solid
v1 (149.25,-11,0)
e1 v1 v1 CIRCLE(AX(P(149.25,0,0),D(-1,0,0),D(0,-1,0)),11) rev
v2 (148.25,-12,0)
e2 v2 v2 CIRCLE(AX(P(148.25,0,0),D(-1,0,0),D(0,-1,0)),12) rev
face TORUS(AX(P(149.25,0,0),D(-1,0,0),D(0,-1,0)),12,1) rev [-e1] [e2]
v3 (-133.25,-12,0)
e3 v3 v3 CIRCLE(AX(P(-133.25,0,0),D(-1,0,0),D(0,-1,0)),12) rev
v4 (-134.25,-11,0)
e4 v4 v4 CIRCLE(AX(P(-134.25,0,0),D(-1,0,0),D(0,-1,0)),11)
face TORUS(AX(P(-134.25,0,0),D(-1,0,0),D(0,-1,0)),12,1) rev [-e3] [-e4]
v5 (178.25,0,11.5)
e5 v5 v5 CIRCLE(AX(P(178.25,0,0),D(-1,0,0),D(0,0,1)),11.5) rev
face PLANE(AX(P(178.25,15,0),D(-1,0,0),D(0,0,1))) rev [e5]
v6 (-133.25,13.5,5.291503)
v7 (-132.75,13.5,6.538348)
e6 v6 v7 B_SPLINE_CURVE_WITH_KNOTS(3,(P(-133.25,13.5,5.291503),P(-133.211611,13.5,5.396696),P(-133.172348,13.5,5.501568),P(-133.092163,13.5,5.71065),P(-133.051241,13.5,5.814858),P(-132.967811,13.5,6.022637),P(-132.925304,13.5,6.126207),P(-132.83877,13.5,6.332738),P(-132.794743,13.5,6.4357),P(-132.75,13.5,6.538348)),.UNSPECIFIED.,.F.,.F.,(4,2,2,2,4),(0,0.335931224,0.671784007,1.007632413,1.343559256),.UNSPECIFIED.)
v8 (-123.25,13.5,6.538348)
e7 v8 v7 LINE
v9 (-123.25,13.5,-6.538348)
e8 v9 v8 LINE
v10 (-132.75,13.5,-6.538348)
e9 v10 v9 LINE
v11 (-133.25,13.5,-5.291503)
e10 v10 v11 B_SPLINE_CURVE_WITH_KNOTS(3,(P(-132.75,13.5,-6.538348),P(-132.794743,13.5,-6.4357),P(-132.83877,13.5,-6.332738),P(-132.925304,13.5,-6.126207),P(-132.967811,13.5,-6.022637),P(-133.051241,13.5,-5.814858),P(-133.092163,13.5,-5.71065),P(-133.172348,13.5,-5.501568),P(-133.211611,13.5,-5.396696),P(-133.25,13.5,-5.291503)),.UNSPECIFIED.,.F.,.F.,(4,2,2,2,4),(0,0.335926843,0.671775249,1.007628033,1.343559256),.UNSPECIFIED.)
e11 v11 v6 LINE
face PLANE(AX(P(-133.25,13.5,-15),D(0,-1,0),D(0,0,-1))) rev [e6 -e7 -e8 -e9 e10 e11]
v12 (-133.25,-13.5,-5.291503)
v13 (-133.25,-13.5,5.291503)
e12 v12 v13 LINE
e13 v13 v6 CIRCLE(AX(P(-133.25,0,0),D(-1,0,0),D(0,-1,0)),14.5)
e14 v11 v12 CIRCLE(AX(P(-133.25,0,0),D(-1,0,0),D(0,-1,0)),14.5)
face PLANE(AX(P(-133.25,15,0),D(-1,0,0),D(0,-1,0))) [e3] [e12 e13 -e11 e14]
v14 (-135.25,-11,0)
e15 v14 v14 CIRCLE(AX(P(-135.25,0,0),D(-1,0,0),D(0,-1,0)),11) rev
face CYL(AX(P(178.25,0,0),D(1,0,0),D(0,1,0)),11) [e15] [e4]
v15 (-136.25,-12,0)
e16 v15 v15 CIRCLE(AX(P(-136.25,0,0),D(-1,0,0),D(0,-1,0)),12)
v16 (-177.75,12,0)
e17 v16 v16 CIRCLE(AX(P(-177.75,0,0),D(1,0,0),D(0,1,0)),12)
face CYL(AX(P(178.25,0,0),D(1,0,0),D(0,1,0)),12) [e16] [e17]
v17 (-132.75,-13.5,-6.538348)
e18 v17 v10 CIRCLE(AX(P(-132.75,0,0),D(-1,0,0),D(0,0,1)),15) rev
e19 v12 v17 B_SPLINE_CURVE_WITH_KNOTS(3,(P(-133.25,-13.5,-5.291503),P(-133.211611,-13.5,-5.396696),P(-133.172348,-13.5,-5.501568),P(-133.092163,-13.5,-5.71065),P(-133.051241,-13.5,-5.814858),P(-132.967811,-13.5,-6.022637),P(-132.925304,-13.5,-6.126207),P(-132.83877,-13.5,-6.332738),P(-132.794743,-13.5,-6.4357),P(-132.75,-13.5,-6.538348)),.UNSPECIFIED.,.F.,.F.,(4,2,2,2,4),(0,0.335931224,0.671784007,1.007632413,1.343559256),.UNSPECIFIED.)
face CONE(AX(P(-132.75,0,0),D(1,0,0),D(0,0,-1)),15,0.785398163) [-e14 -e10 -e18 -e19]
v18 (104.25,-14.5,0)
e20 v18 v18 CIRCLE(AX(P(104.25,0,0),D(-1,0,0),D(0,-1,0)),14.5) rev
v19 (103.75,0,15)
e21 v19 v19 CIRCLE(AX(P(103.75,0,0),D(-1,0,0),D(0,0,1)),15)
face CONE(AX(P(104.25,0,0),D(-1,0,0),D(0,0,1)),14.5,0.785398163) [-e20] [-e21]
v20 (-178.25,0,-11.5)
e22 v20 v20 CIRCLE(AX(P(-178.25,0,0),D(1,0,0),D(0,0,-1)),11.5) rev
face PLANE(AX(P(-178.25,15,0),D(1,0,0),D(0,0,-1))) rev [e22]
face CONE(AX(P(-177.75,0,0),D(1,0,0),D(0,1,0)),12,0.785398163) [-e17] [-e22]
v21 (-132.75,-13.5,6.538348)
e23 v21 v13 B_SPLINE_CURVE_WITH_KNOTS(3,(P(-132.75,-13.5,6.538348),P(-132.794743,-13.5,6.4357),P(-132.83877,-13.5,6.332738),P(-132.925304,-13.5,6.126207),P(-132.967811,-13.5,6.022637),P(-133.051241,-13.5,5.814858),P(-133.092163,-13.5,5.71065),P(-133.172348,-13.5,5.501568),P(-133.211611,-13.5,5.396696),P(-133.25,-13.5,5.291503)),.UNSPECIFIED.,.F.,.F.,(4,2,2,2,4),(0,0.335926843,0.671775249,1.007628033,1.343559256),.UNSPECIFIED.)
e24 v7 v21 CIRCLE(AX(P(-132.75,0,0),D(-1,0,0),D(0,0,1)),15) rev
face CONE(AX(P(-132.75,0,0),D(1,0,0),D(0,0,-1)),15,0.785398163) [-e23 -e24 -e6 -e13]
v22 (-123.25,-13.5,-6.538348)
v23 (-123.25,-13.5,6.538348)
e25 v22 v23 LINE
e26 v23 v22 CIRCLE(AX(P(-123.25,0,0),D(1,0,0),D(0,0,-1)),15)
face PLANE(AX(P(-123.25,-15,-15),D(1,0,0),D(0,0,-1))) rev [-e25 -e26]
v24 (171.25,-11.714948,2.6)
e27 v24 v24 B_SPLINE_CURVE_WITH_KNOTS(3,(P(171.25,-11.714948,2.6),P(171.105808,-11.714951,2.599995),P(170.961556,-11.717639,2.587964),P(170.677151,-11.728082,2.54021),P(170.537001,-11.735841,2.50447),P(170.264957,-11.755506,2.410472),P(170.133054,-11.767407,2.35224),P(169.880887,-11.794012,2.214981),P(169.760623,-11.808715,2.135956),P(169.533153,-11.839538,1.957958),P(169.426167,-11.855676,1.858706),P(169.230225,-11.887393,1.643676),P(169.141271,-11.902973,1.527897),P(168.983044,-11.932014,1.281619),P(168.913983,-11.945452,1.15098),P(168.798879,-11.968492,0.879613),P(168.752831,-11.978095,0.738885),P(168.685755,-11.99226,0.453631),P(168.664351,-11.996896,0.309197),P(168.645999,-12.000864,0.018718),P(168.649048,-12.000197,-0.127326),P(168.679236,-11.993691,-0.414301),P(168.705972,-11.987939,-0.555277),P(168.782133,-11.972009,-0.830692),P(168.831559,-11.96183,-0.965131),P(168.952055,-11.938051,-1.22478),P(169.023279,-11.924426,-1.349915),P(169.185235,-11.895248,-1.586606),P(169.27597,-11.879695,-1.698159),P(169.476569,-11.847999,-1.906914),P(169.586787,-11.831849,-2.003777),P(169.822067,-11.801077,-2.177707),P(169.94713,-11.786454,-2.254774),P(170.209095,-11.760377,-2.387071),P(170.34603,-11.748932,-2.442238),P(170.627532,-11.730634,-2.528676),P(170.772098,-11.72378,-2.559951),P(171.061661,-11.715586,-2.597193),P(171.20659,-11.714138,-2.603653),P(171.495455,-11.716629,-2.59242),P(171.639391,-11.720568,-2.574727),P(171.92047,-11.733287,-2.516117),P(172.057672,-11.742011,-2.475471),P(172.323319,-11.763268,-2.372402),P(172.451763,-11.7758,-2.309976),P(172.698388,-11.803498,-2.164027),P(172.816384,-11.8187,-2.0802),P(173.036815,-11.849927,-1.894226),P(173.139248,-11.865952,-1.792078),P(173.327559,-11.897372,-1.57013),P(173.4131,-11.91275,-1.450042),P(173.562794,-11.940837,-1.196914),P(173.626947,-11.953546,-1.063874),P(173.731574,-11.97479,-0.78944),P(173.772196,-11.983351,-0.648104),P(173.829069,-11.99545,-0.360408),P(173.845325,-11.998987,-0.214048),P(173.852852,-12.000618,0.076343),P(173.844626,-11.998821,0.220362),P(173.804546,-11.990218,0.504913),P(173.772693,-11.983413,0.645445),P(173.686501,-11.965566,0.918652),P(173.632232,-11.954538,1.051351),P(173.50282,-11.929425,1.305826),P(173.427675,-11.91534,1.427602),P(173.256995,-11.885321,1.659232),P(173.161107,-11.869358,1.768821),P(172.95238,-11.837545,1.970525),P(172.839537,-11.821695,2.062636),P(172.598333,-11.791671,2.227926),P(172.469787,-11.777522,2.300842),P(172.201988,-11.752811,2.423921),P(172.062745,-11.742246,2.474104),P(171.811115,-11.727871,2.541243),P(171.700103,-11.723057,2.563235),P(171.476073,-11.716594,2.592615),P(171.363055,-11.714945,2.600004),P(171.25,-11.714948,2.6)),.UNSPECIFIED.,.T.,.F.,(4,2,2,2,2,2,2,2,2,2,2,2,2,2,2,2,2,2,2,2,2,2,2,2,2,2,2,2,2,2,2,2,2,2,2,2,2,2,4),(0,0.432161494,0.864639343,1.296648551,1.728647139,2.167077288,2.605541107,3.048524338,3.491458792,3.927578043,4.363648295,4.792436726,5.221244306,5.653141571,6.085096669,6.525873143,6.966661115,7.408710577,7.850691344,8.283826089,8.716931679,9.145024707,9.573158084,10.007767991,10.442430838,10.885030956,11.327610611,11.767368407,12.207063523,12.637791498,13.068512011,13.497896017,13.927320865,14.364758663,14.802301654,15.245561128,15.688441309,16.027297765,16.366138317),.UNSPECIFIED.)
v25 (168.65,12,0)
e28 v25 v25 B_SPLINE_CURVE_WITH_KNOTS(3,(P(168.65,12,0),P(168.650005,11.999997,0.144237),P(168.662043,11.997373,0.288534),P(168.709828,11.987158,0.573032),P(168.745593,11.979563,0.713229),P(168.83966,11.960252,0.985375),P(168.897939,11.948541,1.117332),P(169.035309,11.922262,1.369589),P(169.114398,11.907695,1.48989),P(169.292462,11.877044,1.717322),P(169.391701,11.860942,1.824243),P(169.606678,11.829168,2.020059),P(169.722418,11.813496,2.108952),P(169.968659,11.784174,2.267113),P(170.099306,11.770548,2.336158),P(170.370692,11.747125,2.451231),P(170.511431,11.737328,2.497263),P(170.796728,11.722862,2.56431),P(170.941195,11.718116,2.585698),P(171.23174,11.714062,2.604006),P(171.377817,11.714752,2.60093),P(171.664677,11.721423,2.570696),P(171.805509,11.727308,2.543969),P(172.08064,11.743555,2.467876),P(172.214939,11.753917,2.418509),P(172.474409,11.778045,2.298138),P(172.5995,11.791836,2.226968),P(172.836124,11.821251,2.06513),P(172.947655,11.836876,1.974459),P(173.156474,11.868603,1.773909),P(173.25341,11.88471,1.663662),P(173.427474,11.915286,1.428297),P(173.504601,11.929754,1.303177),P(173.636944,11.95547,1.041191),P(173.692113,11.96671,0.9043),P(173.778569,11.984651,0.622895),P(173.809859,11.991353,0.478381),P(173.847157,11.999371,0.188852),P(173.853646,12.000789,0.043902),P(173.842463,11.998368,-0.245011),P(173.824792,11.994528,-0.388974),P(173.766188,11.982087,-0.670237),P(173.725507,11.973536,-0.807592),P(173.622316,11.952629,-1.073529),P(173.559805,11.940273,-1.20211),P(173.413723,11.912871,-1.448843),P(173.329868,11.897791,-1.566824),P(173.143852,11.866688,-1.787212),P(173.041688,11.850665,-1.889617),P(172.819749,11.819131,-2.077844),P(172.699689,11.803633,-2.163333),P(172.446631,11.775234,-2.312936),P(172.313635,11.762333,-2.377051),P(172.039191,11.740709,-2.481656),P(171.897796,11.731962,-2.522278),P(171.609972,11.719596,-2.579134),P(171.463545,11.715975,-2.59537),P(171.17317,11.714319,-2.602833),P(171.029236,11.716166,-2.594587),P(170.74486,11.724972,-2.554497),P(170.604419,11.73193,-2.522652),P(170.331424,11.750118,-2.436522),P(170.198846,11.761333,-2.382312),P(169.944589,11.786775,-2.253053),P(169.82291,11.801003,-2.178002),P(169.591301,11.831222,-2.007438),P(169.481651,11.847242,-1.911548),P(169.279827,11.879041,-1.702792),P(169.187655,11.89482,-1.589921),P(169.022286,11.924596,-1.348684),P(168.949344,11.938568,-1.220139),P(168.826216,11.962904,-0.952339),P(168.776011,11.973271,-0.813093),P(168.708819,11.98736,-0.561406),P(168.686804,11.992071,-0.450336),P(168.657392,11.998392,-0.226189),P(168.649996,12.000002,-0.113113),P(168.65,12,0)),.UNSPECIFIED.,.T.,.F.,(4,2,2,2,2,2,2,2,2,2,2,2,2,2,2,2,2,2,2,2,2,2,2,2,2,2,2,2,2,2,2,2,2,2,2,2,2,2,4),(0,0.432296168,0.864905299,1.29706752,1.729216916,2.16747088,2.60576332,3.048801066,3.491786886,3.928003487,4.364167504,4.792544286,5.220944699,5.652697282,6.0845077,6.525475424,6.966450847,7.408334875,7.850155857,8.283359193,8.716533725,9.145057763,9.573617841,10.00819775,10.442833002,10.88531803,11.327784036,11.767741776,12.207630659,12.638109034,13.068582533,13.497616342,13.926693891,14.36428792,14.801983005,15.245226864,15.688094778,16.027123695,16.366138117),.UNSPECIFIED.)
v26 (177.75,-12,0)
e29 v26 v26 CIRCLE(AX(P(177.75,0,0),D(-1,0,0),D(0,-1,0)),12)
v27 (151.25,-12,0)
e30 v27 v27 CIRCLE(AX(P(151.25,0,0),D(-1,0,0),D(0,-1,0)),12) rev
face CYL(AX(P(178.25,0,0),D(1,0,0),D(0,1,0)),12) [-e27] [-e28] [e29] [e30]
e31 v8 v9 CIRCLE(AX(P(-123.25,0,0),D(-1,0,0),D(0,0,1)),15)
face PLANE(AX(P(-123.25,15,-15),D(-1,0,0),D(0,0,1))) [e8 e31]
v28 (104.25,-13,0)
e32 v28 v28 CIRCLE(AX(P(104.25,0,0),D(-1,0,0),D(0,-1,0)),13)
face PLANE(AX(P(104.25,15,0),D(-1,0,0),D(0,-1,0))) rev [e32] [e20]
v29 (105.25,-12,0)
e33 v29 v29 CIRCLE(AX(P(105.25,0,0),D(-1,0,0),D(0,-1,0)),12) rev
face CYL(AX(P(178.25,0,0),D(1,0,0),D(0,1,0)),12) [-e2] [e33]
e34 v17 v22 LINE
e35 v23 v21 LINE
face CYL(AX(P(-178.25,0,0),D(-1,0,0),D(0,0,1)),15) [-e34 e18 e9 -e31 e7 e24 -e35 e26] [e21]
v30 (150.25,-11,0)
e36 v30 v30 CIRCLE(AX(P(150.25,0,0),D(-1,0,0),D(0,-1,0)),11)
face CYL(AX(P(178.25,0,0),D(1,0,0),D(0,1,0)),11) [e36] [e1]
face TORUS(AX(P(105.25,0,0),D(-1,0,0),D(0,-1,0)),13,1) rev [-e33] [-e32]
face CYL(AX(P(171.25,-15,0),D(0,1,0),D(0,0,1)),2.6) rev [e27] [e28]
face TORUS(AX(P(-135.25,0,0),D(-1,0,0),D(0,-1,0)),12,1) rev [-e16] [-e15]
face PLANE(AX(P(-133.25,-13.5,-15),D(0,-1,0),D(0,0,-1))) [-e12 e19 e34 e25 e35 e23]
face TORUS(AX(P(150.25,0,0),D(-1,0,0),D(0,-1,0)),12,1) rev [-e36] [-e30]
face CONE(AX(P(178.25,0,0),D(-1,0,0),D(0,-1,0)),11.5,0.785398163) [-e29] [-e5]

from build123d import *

# Parameters (mm, degrees)
SKETCH1_W               = 356.5
SKETCH1_H               = 15
SKETCH2_W               = 3
SKETCH2_H               = 1
CUT_EXTRUDE1_DEPTH      = 180.507834091
CUT_EXTRUDE1_DEPTH_BACK = 180.507834091
SKETCH3_R               = 2.6
CUT_EXTRUDE2_DEPTH      = 180.50783419
CUT_EXTRUDE2_DEPTH_BACK = 180.50783419
SKETCH4_W               = 10
SKETCH4_H               = 1.5
FILLET1_R               = 1
CHAMFER1_SIZE           = 0.5


with BuildPart() as part:
    # Sketch1 → Revolve1 (revolve)
    with BuildSketch(Plane.XY, mode=Mode.PRIVATE) as revolve1_sk:
        with Locations((0, 7.5)):
            Rectangle(SKETCH1_W, SKETCH1_H)
    revolve(revolve1_sk.sketch.rotate(Axis((-178.25, 0, 0), (1, 0, 0)), 90), axis=Axis((-178.25, 0, 0), (1, 0, 0)))

    # Sketch2 → Cut-Revolve1 (revolve, cut)
    with BuildSketch(Plane.XY):
        Polygon((178.25, 12), (178.25, 15), (104.25, 15), (104.25, 12), (148.25, 12), (151.25, 12), align=None)
        with Locations((149.75, 11.5)):
            Rectangle(SKETCH2_W, SKETCH2_H)
        Polygon((-133.25, 15), (-178.25, 15), (-178.25, 12), (-136.25, 12), (-133.25, 12), align=None)
        with Locations((-134.75, 11.5)):
            Rectangle(SKETCH2_W, SKETCH2_H)
    revolve(axis=Axis((178.25, 0, 0), (-1, 0, 0)), mode=Mode.SUBTRACT)

    # Sketch3 → Cut-Extrude1 (cut, two sides: drawn at the far end of the back side and taken through both)
    with BuildSketch(Plane(origin=(0, 0, 0), x_dir=(1, 0, 0), z_dir=(0, 1, 0)).offset(-CUT_EXTRUDE1_DEPTH_BACK)):
        with Locations(Location((171.25, 0, 0), (0, 0, 270))):
            Circle(SKETCH3_R)
    extrude(amount=CUT_EXTRUDE1_DEPTH + CUT_EXTRUDE1_DEPTH_BACK, mode=Mode.SUBTRACT)

    # Sketch4 → Cut-Extrude2 (cut, two sides: drawn at the far end of the back side and taken through both)
    with BuildSketch(Plane.XY.offset(-CUT_EXTRUDE2_DEPTH_BACK)):
        with Locations((-128.25, 14.25)):
            Rectangle(SKETCH4_W, SKETCH4_H)
        with Locations((-128.25, -14.25)):
            Rectangle(SKETCH4_W, SKETCH4_H)
    extrude(amount=CUT_EXTRUDE2_DEPTH + CUT_EXTRUDE2_DEPTH_BACK, mode=Mode.SUBTRACT)

    # Fillet1
    fillet1_edges = [part.edges().sort_by_distance(p)[0] for p in [
        (104.25, -12, 0),
        (151.25, -11, 0),
        (148.25, -11, 0),
        (-133.25, -11, 0),
        (-136.25, -11, 0),
    ]]
    fillet(fillet1_edges, radius=FILLET1_R - 0.0001)  # a hair under: the kernel refuses the full size

    # Chamfer1
    chamfer1_edges = [part.edges().sort_by_distance(p)[0] for p in [
        (178.25, -12, 0),
        (104.25, 0, -15),
        (-178.25, -12, 0),
        (-133.25, -7.966328319, 12.709744809),
        (-133.25, 0, -15),
    ]]
    chamfer(chamfer1_edges, length=CHAMFER1_SIZE)


solid = part.part
